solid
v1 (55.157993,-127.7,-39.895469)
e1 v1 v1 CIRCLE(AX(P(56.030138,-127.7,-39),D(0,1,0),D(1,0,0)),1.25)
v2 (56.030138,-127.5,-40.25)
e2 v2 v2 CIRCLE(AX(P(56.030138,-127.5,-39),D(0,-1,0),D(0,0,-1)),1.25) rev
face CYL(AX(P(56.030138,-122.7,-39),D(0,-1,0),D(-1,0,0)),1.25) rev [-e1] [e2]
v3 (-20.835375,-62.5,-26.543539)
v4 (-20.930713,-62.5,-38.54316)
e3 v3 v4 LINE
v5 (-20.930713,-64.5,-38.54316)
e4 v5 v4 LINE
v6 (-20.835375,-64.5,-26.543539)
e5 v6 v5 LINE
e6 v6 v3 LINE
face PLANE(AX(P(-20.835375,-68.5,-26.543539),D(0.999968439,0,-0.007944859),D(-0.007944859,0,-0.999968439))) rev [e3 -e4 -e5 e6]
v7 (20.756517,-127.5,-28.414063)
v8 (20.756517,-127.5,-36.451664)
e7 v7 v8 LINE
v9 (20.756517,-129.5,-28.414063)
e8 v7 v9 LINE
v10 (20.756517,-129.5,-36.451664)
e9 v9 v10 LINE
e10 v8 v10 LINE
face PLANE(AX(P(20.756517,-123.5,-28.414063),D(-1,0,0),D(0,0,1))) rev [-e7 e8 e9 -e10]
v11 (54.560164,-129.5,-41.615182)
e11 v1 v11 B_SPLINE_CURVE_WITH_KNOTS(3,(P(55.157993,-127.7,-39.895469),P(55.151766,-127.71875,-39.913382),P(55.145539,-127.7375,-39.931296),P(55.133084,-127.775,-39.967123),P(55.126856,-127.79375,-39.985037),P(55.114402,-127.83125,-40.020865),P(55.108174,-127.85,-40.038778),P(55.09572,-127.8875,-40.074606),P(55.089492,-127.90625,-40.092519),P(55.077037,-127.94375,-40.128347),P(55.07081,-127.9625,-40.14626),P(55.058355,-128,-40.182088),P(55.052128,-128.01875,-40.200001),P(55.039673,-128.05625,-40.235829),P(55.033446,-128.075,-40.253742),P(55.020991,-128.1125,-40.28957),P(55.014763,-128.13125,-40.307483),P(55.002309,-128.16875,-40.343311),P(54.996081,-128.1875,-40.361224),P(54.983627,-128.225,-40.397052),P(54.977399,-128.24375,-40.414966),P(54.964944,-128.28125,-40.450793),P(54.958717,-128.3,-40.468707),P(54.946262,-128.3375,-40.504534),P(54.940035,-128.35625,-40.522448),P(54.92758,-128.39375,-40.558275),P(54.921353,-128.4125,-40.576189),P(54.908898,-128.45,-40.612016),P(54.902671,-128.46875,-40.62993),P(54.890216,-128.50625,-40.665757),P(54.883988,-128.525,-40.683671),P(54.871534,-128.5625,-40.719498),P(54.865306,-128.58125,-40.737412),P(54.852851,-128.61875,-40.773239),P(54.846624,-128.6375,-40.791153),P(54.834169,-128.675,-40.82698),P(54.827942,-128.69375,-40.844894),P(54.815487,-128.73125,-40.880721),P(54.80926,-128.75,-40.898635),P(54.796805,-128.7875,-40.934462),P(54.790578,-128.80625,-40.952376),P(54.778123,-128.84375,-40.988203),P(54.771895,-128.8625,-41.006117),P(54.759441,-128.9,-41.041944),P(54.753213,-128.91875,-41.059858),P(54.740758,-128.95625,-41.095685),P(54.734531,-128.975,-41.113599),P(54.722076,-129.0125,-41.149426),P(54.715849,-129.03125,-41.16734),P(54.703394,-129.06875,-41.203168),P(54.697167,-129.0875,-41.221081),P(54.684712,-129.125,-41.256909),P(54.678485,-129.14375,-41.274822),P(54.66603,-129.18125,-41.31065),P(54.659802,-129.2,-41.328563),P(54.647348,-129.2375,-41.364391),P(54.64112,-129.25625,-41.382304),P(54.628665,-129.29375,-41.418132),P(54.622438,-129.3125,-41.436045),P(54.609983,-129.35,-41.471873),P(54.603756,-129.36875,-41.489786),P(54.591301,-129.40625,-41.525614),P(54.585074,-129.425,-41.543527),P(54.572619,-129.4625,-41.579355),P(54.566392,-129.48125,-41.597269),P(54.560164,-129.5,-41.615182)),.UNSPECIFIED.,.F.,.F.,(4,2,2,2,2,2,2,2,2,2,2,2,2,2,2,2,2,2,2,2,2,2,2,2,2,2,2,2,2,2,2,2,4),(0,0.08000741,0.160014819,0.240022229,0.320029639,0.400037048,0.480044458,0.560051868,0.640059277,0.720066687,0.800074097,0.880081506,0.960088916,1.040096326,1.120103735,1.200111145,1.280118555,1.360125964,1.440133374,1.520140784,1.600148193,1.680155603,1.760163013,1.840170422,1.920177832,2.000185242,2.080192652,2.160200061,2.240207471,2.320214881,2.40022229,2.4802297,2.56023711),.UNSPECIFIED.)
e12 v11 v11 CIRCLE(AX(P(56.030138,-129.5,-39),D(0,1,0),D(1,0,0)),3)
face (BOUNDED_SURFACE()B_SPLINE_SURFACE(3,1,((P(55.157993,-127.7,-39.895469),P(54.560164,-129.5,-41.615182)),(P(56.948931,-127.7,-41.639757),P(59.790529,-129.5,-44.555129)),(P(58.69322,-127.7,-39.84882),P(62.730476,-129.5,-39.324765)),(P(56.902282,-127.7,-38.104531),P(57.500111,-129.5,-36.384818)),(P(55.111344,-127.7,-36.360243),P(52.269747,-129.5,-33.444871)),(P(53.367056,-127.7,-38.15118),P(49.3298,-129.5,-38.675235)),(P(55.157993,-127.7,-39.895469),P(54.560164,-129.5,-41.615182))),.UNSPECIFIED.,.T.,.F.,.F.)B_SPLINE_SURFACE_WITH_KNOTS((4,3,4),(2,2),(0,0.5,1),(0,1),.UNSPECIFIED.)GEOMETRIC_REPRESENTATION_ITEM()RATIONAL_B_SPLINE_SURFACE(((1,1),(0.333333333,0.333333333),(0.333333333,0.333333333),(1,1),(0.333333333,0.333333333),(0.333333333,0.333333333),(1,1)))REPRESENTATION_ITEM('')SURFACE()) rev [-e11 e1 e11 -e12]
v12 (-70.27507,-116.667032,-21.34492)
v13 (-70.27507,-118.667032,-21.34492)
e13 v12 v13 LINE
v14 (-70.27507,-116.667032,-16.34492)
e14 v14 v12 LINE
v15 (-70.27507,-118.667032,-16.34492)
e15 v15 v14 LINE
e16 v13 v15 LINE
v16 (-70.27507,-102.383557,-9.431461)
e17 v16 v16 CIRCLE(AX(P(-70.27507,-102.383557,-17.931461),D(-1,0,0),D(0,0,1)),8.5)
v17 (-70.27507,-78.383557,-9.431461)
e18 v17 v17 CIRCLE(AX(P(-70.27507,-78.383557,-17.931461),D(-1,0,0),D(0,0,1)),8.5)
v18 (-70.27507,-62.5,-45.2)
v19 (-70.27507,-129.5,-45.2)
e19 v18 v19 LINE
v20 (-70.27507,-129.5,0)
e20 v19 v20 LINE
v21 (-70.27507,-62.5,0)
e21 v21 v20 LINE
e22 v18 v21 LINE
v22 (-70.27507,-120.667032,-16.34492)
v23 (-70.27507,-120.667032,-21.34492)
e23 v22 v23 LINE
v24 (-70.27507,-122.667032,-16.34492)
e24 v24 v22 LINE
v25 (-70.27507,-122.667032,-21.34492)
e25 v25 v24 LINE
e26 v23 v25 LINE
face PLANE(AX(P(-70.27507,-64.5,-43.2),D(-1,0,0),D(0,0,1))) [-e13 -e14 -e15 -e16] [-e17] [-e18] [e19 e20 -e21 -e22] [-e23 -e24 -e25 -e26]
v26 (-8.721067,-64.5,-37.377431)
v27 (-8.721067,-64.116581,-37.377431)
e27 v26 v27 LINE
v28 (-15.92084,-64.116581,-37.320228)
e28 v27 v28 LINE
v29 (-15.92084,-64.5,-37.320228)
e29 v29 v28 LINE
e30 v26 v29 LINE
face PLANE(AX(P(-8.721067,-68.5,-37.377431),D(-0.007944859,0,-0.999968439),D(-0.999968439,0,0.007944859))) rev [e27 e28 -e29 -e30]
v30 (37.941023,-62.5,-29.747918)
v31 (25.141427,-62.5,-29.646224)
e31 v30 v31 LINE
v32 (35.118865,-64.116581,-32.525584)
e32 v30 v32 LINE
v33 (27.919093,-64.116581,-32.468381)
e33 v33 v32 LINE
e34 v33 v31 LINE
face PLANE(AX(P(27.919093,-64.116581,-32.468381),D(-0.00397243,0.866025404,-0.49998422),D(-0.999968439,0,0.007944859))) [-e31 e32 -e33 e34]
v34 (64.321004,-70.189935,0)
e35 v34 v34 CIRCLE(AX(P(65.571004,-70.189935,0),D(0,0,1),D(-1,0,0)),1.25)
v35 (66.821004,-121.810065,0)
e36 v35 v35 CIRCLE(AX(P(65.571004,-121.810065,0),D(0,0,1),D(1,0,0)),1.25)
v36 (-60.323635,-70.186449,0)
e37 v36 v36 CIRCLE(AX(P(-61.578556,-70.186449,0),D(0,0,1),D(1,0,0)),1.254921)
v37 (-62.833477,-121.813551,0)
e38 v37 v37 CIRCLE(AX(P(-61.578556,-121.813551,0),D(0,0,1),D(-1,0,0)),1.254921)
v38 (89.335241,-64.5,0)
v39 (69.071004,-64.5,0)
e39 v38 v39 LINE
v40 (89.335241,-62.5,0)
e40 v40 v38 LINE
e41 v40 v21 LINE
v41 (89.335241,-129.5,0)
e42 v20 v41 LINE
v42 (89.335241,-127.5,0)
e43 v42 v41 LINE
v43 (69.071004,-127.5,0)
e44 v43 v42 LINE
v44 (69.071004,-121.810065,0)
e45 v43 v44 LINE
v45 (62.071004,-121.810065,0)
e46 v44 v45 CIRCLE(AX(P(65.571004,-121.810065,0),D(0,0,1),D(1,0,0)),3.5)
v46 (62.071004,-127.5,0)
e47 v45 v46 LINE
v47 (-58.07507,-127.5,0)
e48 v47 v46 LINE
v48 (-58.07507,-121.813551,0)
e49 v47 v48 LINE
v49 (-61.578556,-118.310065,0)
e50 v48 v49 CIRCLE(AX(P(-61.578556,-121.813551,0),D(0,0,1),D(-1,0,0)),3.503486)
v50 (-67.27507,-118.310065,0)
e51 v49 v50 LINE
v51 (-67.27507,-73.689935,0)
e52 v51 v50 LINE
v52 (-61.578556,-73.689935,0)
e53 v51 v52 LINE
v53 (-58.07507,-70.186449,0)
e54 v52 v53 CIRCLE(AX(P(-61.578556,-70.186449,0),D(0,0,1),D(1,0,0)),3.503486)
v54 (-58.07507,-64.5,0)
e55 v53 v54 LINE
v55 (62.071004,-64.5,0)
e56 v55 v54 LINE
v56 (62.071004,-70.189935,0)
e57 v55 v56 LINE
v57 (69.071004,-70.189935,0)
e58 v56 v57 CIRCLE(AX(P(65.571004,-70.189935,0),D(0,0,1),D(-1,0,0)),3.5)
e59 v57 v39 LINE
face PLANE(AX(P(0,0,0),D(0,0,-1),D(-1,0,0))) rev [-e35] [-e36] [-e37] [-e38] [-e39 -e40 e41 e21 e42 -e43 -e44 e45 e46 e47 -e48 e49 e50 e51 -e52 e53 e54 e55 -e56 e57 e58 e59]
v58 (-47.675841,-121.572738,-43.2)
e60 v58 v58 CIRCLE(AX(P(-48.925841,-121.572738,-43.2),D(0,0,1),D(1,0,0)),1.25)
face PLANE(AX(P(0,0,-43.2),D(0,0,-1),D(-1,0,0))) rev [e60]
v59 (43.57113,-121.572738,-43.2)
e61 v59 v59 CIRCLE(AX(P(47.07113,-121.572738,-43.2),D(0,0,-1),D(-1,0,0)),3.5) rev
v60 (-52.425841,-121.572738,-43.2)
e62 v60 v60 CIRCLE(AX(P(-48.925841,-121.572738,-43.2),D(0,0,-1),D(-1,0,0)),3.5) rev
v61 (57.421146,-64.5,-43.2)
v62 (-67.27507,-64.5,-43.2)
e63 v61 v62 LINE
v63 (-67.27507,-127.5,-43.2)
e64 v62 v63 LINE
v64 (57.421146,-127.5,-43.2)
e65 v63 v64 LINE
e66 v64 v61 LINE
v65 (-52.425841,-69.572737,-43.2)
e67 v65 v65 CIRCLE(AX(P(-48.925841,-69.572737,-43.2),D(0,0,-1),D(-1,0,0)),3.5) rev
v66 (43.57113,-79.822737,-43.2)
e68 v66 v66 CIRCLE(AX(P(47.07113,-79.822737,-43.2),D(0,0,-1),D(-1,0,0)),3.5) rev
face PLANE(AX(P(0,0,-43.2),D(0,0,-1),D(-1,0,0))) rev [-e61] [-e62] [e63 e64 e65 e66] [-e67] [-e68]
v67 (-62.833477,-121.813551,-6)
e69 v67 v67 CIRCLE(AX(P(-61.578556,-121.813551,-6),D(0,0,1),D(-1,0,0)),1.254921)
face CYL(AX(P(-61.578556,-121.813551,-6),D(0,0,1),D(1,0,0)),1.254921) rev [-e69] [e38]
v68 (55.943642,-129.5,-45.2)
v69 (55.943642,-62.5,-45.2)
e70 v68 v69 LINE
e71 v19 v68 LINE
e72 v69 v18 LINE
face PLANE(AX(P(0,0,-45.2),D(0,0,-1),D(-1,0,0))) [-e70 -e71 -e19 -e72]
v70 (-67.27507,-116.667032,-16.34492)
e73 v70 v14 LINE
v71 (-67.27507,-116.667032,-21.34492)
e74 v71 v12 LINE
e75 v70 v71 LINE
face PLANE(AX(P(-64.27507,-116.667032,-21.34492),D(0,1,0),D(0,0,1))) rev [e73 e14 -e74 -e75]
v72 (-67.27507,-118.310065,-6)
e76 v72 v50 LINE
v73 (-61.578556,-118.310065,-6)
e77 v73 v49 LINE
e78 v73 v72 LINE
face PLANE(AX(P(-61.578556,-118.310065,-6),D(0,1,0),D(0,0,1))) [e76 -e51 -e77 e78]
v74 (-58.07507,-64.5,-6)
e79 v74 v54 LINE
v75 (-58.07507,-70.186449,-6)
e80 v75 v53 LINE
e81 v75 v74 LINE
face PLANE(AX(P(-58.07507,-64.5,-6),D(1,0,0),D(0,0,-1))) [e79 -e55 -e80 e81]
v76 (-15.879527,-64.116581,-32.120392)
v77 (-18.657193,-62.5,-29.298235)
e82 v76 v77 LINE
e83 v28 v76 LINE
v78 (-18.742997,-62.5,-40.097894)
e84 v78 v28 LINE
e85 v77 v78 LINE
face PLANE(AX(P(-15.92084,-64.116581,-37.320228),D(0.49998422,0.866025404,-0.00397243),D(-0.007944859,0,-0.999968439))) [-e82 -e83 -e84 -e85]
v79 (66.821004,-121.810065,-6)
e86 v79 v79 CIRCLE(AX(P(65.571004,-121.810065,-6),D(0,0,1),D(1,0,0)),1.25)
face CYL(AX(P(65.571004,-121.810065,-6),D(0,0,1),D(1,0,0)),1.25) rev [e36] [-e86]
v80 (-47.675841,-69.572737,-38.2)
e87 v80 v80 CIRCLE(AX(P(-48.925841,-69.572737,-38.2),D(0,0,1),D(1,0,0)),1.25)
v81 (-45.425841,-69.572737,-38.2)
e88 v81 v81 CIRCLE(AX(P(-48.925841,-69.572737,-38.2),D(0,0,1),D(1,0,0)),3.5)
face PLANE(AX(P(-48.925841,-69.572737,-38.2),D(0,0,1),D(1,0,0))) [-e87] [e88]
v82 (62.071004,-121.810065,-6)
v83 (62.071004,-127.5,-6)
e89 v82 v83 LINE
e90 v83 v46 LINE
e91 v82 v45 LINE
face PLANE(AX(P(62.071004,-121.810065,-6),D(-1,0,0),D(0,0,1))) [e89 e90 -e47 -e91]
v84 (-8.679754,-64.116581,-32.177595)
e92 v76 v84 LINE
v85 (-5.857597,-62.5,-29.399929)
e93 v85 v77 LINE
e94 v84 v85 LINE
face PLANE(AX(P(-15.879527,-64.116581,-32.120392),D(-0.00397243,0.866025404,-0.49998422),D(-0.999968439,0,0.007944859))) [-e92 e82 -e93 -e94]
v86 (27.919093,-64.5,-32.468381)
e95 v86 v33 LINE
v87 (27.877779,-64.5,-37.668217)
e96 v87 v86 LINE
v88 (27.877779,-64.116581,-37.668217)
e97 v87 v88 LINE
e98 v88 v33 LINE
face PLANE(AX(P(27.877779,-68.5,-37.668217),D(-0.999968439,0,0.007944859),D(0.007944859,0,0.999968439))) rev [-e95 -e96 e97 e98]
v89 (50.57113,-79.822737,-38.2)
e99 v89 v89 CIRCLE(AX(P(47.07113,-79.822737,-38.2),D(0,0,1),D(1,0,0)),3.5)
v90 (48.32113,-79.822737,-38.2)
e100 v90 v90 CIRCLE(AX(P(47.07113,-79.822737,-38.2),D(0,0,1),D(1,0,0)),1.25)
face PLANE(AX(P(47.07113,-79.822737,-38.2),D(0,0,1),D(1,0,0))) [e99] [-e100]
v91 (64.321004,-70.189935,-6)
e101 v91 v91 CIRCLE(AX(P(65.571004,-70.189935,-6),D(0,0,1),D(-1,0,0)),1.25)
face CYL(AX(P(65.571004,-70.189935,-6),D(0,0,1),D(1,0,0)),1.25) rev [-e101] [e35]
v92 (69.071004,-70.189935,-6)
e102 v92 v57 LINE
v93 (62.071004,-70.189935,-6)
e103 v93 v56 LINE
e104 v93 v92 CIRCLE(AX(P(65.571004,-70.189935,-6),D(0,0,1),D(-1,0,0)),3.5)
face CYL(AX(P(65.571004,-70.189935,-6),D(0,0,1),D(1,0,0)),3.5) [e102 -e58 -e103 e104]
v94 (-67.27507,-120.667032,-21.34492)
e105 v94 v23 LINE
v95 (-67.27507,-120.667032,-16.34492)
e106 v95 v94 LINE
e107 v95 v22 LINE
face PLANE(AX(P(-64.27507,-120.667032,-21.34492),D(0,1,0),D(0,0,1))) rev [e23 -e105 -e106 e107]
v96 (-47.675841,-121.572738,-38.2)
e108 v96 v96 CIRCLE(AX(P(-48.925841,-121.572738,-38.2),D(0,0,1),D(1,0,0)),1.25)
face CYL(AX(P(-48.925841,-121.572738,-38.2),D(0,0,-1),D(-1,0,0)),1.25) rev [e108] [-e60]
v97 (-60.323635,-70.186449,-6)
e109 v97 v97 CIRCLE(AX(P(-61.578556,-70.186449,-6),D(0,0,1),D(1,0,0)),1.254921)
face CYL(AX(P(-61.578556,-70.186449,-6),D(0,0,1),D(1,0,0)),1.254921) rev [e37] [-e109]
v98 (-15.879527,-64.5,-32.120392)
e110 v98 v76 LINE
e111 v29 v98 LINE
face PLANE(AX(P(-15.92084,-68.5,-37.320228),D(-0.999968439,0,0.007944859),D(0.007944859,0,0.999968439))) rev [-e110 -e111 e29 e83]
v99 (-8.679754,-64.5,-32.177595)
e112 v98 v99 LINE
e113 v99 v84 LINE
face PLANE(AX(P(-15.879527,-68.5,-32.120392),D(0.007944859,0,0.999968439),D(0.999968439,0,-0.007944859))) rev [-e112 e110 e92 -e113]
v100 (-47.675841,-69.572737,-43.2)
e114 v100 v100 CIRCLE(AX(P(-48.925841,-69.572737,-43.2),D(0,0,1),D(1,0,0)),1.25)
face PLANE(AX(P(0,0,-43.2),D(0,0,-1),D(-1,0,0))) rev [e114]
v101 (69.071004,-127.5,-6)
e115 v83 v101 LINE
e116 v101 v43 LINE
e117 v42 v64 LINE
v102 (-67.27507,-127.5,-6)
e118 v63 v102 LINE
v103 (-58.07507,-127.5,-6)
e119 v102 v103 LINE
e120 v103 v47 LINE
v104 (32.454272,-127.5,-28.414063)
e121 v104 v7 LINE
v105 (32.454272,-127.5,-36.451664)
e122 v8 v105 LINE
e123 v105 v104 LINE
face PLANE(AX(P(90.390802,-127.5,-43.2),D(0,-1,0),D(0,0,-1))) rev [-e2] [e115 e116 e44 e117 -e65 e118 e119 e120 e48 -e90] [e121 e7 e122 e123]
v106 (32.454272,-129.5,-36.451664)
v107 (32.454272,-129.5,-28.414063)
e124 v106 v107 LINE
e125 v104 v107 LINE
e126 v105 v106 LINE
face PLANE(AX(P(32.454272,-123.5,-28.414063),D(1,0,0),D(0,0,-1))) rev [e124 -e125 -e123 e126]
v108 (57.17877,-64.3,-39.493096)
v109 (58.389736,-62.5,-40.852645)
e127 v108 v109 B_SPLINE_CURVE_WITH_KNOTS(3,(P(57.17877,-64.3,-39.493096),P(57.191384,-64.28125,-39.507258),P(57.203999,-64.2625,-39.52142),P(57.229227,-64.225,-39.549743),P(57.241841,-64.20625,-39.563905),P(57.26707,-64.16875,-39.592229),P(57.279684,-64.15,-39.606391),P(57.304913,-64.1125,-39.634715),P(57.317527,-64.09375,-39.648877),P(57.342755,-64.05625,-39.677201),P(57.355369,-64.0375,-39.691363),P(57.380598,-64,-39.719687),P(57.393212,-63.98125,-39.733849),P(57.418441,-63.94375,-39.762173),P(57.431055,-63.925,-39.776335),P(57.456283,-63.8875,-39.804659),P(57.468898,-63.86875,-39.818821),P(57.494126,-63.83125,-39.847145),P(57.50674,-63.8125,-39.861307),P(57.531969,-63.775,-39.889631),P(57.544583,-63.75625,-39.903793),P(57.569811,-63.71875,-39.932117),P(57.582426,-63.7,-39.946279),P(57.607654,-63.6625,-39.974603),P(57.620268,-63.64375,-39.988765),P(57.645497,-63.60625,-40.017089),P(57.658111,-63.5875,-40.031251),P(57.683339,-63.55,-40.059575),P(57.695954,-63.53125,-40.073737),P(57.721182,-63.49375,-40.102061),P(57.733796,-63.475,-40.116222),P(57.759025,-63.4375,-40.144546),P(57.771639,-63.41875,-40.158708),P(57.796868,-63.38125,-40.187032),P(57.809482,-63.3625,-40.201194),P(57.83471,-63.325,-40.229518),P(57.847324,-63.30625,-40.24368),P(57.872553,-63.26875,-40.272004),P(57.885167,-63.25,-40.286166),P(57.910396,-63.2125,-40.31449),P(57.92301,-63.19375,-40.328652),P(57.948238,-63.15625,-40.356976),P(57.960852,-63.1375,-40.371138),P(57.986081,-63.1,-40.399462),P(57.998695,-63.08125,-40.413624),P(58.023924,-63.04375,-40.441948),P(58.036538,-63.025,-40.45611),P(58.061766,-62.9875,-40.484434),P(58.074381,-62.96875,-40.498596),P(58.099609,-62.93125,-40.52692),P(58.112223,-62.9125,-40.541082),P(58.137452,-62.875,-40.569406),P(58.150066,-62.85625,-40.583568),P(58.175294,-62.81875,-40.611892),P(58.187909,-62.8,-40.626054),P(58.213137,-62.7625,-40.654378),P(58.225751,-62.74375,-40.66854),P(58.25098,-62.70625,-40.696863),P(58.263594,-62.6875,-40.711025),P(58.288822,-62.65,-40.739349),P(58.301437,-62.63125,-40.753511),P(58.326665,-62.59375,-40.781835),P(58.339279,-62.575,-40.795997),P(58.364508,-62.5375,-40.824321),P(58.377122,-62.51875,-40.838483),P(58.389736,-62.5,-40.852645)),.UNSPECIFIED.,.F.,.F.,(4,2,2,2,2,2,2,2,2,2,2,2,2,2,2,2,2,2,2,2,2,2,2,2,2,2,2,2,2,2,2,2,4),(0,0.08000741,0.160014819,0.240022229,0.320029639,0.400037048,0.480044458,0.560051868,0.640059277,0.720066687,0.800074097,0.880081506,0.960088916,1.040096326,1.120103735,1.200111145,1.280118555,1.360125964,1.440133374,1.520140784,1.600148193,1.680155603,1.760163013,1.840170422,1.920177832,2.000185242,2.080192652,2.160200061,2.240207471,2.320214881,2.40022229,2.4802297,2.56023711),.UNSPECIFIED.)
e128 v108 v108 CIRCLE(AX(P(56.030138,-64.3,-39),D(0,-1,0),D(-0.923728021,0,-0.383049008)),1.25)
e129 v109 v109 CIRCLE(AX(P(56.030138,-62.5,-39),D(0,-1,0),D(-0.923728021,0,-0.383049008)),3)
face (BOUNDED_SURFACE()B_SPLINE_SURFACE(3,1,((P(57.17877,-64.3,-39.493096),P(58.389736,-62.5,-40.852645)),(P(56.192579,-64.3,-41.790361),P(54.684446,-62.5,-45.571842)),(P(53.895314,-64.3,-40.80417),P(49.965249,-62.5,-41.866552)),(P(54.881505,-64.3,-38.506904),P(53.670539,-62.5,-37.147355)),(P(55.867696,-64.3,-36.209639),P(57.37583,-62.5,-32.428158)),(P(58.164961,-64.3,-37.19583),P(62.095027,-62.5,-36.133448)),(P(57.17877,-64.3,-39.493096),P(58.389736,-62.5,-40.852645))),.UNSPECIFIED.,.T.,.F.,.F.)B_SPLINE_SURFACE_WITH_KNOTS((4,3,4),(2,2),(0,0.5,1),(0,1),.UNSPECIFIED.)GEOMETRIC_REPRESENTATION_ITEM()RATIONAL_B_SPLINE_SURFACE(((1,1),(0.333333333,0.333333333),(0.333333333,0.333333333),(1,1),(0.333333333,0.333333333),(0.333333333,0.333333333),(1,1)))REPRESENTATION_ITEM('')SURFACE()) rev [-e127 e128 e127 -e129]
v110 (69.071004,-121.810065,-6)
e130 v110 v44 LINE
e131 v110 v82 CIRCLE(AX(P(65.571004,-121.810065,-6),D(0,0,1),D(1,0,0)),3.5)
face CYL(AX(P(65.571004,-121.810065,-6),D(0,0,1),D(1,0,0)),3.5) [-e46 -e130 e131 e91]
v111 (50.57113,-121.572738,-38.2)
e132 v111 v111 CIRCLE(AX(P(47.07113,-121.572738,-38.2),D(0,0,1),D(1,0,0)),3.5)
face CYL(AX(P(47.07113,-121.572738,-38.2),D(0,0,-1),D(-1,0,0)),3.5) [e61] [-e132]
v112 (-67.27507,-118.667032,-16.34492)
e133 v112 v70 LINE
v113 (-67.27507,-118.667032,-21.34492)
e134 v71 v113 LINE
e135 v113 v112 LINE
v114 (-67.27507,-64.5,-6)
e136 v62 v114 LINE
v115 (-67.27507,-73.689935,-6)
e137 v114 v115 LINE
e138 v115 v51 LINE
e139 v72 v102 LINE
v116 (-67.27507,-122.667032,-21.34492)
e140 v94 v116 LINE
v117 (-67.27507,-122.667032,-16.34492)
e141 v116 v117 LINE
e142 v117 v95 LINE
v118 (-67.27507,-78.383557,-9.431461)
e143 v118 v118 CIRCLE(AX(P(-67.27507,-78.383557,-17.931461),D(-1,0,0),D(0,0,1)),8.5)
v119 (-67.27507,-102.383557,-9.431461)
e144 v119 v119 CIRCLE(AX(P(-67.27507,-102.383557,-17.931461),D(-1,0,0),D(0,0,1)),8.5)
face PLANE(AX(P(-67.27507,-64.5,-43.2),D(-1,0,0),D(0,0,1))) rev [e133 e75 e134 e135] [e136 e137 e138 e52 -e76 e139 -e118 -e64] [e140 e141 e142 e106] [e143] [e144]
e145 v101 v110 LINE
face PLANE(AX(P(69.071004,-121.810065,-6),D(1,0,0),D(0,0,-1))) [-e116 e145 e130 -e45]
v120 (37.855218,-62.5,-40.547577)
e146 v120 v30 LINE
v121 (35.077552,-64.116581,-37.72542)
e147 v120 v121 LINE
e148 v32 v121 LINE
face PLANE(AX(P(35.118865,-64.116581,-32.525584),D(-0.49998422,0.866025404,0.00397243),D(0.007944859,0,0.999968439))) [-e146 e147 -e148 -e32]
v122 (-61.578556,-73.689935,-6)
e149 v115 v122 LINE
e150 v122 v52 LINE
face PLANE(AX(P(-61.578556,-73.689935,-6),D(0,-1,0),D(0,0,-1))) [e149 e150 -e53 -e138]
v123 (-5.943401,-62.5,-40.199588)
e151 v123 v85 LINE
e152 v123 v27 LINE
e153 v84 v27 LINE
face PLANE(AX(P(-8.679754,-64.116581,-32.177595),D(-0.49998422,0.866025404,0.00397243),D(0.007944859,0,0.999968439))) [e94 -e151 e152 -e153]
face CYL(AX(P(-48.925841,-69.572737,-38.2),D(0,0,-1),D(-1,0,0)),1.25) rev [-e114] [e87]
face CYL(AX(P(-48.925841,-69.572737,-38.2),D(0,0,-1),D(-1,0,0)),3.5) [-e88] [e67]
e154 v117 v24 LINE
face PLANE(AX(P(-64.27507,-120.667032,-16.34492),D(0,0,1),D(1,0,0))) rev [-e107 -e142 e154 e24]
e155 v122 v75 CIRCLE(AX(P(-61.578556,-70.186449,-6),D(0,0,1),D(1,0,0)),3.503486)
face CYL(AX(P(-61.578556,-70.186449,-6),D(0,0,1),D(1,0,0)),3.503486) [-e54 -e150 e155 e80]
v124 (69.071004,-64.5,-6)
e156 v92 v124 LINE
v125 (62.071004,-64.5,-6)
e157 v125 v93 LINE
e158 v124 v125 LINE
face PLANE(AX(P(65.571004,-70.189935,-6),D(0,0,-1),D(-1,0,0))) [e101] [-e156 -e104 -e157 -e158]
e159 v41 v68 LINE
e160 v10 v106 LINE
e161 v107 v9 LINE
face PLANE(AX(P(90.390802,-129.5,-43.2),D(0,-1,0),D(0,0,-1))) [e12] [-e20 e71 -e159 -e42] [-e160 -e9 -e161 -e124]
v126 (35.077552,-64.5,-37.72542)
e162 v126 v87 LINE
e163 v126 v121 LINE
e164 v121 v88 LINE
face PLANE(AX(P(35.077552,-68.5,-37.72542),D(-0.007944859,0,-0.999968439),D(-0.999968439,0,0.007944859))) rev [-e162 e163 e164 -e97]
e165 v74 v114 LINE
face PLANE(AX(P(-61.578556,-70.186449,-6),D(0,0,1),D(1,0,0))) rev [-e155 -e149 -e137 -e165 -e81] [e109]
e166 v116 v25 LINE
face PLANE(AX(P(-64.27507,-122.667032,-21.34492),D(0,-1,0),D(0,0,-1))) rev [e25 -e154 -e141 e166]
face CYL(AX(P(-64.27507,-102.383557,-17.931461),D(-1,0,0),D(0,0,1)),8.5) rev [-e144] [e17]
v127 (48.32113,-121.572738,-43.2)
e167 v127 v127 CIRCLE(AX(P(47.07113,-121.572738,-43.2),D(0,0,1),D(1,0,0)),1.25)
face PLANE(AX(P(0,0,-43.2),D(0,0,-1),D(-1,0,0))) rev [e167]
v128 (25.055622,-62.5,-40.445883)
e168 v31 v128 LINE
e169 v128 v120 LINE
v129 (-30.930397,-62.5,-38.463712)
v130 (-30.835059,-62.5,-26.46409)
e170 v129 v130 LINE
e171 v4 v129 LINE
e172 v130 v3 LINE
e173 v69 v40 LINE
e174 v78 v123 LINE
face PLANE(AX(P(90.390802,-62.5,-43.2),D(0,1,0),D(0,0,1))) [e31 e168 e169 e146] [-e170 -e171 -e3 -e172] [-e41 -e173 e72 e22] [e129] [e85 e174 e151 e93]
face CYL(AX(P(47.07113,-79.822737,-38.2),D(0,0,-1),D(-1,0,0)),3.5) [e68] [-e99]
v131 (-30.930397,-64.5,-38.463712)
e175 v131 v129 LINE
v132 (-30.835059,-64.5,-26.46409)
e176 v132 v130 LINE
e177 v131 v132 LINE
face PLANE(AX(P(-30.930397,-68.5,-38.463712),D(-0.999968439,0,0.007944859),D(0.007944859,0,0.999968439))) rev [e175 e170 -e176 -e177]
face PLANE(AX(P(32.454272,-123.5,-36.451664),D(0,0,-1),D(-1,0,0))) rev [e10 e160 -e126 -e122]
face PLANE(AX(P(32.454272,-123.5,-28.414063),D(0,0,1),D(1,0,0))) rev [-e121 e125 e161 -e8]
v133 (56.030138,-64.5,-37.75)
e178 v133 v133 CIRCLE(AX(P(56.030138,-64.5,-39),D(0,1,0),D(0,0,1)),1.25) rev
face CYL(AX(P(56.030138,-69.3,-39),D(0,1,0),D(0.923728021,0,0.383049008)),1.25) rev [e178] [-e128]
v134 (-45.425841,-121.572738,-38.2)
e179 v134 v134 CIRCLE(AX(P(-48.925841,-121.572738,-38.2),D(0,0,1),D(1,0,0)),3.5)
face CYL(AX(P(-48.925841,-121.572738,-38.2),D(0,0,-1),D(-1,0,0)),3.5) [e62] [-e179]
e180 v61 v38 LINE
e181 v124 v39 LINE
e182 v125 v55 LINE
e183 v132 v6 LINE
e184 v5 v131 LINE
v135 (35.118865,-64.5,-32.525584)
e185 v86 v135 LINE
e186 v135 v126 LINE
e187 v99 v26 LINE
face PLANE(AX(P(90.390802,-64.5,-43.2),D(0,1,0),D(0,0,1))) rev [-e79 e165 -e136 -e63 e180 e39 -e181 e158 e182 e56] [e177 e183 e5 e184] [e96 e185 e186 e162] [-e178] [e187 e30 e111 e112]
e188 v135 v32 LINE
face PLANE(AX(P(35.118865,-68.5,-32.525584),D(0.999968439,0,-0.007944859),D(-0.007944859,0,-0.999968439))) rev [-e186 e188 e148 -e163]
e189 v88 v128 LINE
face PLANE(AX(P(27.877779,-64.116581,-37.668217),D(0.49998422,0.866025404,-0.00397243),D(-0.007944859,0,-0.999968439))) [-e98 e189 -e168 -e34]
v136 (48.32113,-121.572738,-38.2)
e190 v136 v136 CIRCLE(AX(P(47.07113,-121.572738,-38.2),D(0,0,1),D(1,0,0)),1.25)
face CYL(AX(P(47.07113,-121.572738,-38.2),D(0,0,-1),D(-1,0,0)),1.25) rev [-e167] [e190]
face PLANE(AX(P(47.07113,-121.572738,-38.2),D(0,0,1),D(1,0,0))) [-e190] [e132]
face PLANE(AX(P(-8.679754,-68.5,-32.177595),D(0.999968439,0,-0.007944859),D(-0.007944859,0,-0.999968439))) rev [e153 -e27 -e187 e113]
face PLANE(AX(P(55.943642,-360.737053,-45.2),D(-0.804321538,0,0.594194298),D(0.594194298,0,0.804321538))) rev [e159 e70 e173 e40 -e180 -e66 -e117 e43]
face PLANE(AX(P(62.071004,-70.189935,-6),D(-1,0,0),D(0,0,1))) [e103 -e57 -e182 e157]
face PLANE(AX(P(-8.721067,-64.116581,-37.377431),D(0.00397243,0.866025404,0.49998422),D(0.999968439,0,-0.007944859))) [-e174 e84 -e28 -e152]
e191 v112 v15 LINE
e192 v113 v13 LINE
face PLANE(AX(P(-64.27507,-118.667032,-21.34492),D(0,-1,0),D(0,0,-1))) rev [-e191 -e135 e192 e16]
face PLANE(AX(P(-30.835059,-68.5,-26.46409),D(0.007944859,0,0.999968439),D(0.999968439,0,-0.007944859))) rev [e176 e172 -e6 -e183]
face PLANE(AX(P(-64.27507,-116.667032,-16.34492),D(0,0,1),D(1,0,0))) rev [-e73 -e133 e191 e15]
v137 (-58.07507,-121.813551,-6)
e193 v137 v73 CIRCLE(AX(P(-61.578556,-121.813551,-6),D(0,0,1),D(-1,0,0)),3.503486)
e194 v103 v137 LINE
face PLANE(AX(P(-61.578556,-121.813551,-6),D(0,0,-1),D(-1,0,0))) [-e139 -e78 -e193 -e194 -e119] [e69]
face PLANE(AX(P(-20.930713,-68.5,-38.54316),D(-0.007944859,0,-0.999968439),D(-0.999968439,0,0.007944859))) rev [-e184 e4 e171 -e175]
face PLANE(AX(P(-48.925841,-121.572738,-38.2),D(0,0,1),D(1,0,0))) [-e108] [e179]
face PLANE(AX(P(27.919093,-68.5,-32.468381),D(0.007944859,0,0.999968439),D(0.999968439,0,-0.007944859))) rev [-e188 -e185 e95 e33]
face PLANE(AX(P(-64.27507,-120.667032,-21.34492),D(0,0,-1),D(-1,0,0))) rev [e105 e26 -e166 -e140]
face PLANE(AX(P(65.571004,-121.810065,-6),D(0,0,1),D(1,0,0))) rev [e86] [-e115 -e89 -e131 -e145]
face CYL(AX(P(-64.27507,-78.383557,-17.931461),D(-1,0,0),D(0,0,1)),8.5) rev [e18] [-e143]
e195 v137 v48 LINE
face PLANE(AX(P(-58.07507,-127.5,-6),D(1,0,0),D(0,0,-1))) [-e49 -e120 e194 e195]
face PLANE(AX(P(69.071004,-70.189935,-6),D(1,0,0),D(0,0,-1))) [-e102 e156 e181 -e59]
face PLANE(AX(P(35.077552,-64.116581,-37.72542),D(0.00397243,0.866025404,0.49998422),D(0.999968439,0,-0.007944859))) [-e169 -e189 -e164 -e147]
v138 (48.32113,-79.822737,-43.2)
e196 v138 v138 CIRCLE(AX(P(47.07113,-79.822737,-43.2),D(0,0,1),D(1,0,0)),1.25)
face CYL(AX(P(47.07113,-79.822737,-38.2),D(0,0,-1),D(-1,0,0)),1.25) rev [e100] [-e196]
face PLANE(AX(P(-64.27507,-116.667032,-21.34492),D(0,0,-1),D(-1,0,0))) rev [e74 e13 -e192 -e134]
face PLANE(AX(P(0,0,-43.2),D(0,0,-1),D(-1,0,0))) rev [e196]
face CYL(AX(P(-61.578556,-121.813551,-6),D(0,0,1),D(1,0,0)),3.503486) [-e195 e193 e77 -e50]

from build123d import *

# Parameters (mm, degrees)
SZKIC1_W                        = 157.665871289
SZKIC1_H                        = 63
DODANIE_WYCI_GNI_CIE1_DEPTH     = 43.2
WYTNIJ_WYCI_GNI_CIE1_DEPTH      = 70
SKORUPA3_START                  = -70.275069684
SKORUPA3_OUTLINE_W              = 67
SKORUPA3_OUTLINE_H              = 48.2
SKORUPA3_DEPTH                  = 3
SKORUPA3_START_2                = -127.5
SKORUPA3_2_DEPTH                = 63
SKORUPA3_START_3                = -129.5
SKORUPA3_3_DEPTH                = 67
SKORUPA3_4_DEPTH                = 2
SKORUPA3_START_4                = -64.5
SKORUPA3_5_DEPTH                = 2
WYTNIJ_WYCI_GNI_CIE3_DEPTH      = 125.94228845
WYTNIJ_WYCI_GNI_CIE3_DEPTH_BACK = 125.94228845
SZKIC8_W                        = 222.336022924
SZKIC8_H                        = 159.302089512
WYTNIJ_WYCI_GNI_CIE5_DEPTH      = 10
GNIAZDO1_START                  = -65
GNIAZDO1_OUTLINE_R              = 1.25
GNIAZDO1_DEPTH                  = 3
GNIAZDO3_START                  = -130
GNIAZDO3_OUTLINE_R              = 1.25
GNIAZDO3_DEPTH                  = 3
SZKIC12_W                       = 5
SZKIC12_H                       = 2
WYTNIJ_WYCI_GNI_CIE6_DEPTH      = 6
SZKIC14_R                       = 8.5
WYTNIJ_WYCI_GNI_CIE7_DEPTH      = 6
SZKIC15_R                       = 1.254921328
SZKIC15_R_2                     = 1.25
DODANIE_WYCI_GNI_CIE3_DEPTH     = 6
WYTNIJ_WYCI_GNI_CIE8_DEPTH      = 6
SFAZOWANIE1_SIZE                = 2.8
SFAZOWANIE1_SIZE2               = 1.616580754
SFAZOWANIE2_SIZE                = 2.8
SFAZOWANIE2_SIZE2               = 1.616580754
SZKIC18_W                       = 11.697755772
SZKIC18_H                       = 8.037601452
WYTNIJ_WYCI_GNI_CIE9_DEPTH      = 6
SZKIC19_R                       = 3.5
SZKIC19_R_2                     = 1.25
DODANIE_WYCI_GNI_CIE4_DEPTH     = 5


with BuildPart() as part:
    # Szkic1 → Dodanie-wyciągnięcie1 (new body)
    with BuildSketch(Plane.XY):
        with Locations((11.557865961, -96)):
            Rectangle(SZKIC1_W, SZKIC1_H)
    extrude(amount=-DODANIE_WYCI_GNI_CIE1_DEPTH)

    # Szkic2 → Wytnij-wyciągnięcie1 (cut)
    with BuildSketch(Plane.XZ.offset(127.5)):
        Polygon((91.579553956, 3.037978518), (97.149949113, -5.556810967), (99.754808073, -53.374579011), (51.257151272, -51.543792256), align=None)
    extrude(amount=-WYTNIJ_WYCI_GNI_CIE1_DEPTH, mode=Mode.SUBTRACT)

    # Skorupa3: read off the stored shape, not the designer's step
    # Skorupa3 outline → Skorupa3 (add)
    with BuildSketch(Plane.YZ.offset(SKORUPA3_START)):
        with Locations((-96, -21.1)):
            Rectangle(SKORUPA3_OUTLINE_W, SKORUPA3_OUTLINE_H)
    extrude(amount=SKORUPA3_DEPTH)

    # Skorupa3 2 outline → Skorupa3 2 (cut)
    with BuildSketch(Plane(origin=(0, 0, 0), x_dir=(1, 0, 0), z_dir=(0, 1, 0)).offset(SKORUPA3_START_2)):
        Polygon((57.421146073, 43.2), (-67.275069684, 43.2), (-67.275069684, 0), (89.335240673, 0), align=None)
    extrude(amount=SKORUPA3_2_DEPTH, mode=Mode.SUBTRACT)

    # Skorupa3 3 outline → Skorupa3 3 (add)
    with BuildSketch(Plane(origin=(0, 0, 0), x_dir=(1, 0, 0), z_dir=(0, 1, 0)).offset(SKORUPA3_START_3)):
        Polygon((95.281348873, -3), (59.673493323, 45.2), (-67.275069684, 45.2), (-67.275069684, 43.2), (57.421146073, 43.2), (89.335240673, 0), (-67.275069684, 0), (-67.275069684, -3), align=None)
    extrude(amount=SKORUPA3_3_DEPTH)

    # Skorupa3 4 outline → Skorupa3 4 (add)
    with BuildSketch(Plane(origin=(0, 0, 0), x_dir=(1, 0, 0), z_dir=(0, 1, 0)).offset(SKORUPA3_START_3)):
        Polygon((57.421146073, 43.2), (-67.275069684, 43.2), (-67.275069684, 0), (89.335240673, 0), align=None)
    extrude(amount=SKORUPA3_4_DEPTH)

    # Skorupa3 5 outline → Skorupa3 5 (add)
    with BuildSketch(Plane(origin=(0, 0, 0), x_dir=(1, 0, 0), z_dir=(0, 1, 0)).offset(SKORUPA3_START_4)):
        Polygon((57.421146073, 43.2), (-67.275069684, 43.2), (-67.275069684, 0), (89.335240673, 0), align=None)
    extrude(amount=SKORUPA3_5_DEPTH)

    # Szkic6 → Wytnij-wyciągnięcie3 (cut, two sides: drawn at the far end of the back side and taken through both)
    with BuildSketch(Plane.XZ.offset(129.5).offset(-WYTNIJ_WYCI_GNI_CIE3_DEPTH_BACK)):
        Polygon((-150.660373393, -324.866196497), (55.943641693, -45.2), (91.551497243, 3), (298.155512329, 282.666196497), (857.487905323, -130.541833674), (408.672019601, -738.074226668), align=None)
    extrude(amount=WYTNIJ_WYCI_GNI_CIE3_DEPTH + WYTNIJ_WYCI_GNI_CIE3_DEPTH_BACK, mode=Mode.SUBTRACT)


with BuildPart() as body_2:
    # Podziel3: the piece on the far side of the plane
    add(part.part)
    split(bisect_by=Plane(origin=(0, 0, 0), x_dir=(-1, 0, 0), z_dir=(0, 0, -1)), keep=Keep.BOTTOM)

    # Szkic8 → Wytnij-wyciągnięcie5 (cut)
    with BuildSketch(Plane(origin=(0, 0, 0), x_dir=(-1, 0, 0), z_dir=(0, 0, -1))):
        with Locations((-14.849623727, -113.028264145)):
            Rectangle(SZKIC8_W, SZKIC8_H)
    extrude(amount=-WYTNIJ_WYCI_GNI_CIE5_DEPTH, mode=Mode.SUBTRACT)


with BuildPart() as part_1:
    add(part.part)

    # Podziel3
    split(bisect_by=Plane(origin=(0, 0, 0), x_dir=(-1, 0, 0), z_dir=(0, 0, -1)), keep=Keep.TOP)

    # Gniazdo1: read off the stored shape, not the designer's step
    # Gniazdo1 outline → Gniazdo1 (cut)
    with BuildSketch(Plane(origin=(0, 0, 0), x_dir=(1, 0, 0), z_dir=(0, 1, 0)).offset(GNIAZDO1_START)):
        with Locations((56.030137684, 39)):
            Circle(GNIAZDO1_OUTLINE_R)
    extrude(amount=GNIAZDO1_DEPTH, mode=Mode.SUBTRACT)

    # Gniazdo1 2: loft between two sections, ruled curve by curve
    gniazdo1_2_from = [
        Edge.make_bspline([(57.178770241, -64.3, -39.493095579), (56.192579083, -64.3, -41.790360692), (53.89531397, -64.3, -40.804169534), (54.881505128, -64.3, -38.506904421), (55.867696286, -64.3, -36.209639308), (58.164961399, -64.3, -37.195830466), (57.178770241, -64.3, -39.493095579)], [0, 0, 0, 0, 0.5, 0.5, 0.5, 1, 1, 1, 1], 3, [1, 0.333333333, 0.333333333, 1, 0.333333333, 0.333333333, 1]),
    ]
    gniazdo1_2_to = [
        Edge.make_bspline([(58.38973631, -62.5, -40.852645223), (54.684445863, -62.5, -45.571842476), (49.965248611, -62.5, -41.866552029), (53.670539058, -62.5, -37.147354777), (57.375829505, -62.5, -32.428157524), (62.095026757, -62.5, -36.133447971), (58.38973631, -62.5, -40.852645223)], [0, 0, 0, 0, 0.5, 0.5, 0.5, 1, 1, 1, 1], 3, [1, 0.333333333, 0.333333333, 1, 0.333333333, 0.333333333, 1]),
    ]
    gniazdo1_2 = Solid(Shell([*[Face.make_surface_from_curves(gniazdo1_2_from[k], gniazdo1_2_to[k]) for k in range(1)], Face(Wire(gniazdo1_2_from)), Face(Wire(gniazdo1_2_to))]))
    add(gniazdo1_2, mode=Mode.SUBTRACT)

    # Gniazdo3: read off the stored shape, not the designer's step
    # Gniazdo3 outline → Gniazdo3 (cut)
    with BuildSketch(Plane(origin=(0, 0, 0), x_dir=(1, 0, 0), z_dir=(0, 1, 0)).offset(GNIAZDO3_START)):
        with Locations((56.030137684, 39)):
            Circle(GNIAZDO3_OUTLINE_R)
    extrude(amount=GNIAZDO3_DEPTH, mode=Mode.SUBTRACT)

    # Gniazdo3 2: loft between two sections, ruled curve by curve
    gniazdo3_2_from = [
        Edge.make_bspline([(55.157993378, -127.7, -39.895468765), (56.948930908, -127.7, -41.639757378), (58.69321952, -127.7, -39.848819848), (56.90228199, -127.7, -38.104531235), (55.111344461, -127.7, -36.360242622), (53.367055848, -127.7, -38.151180152), (55.157993378, -127.7, -39.895468765)], [0, 0, 0, 0, 0.5, 0.5, 0.5, 1, 1, 1, 1], 3, [1, 0.333333333, 0.333333333, 1, 0.333333333, 0.333333333, 1]),
    ]
    gniazdo3_2_to = [
        Edge.make_bspline([(54.560164229, -129.5, -41.61518222), (59.790528668, -129.5, -44.555129129), (62.730475578, -129.5, -39.32476469), (57.500111139, -129.5, -36.38481778), (52.2697467, -129.5, -33.444870871), (49.32979979, -129.5, -38.67523531), (54.560164229, -129.5, -41.61518222)], [0, 0, 0, 0, 0.5, 0.5, 0.5, 1, 1, 1, 1], 3, [1, 0.333333333, 0.333333333, 1, 0.333333333, 0.333333333, 1]),
    ]
    gniazdo3_2 = Solid(Shell([*[Face.make_surface_from_curves(gniazdo3_2_from[k], gniazdo3_2_to[k]) for k in range(1)], Face(Wire(gniazdo3_2_from)), Face(Wire(gniazdo3_2_to))]))
    add(gniazdo3_2, mode=Mode.SUBTRACT)

    # Szkic12 → Wytnij-wyciągnięcie6 (cut)
    with BuildSketch(Plane.ZY.offset(70.275069684)):
        with Locations((-18.844920008, -121.667032498)):
            Rectangle(SZKIC12_W, SZKIC12_H)
        with Locations((-18.844920008, -117.667032498)):
            Rectangle(SZKIC12_W, SZKIC12_H)
    extrude(amount=-WYTNIJ_WYCI_GNI_CIE6_DEPTH, mode=Mode.SUBTRACT)

    # Szkic14 → Wytnij-wyciągnięcie7 (cut)
    with BuildSketch(Plane.ZY.offset(70.275069684)):
        with Locations((-17.931460918, -102.383556509)):
            Circle(SZKIC14_R)
        with Locations((-17.931460918, -78.383556509)):
            Circle(SZKIC14_R)
    extrude(amount=-WYTNIJ_WYCI_GNI_CIE7_DEPTH, mode=Mode.SUBTRACT)

    # Szkic15 → Dodanie-wyciągnięcie3 (add)
    # profile 1 of 4: a face of its own
    with BuildSketch(Plane.XY):
        with BuildLine():
            Line((-67.275069684, -64.5), (-58.075069684, -64.5))
            Line((-58.075069684, -64.5), (-58.075069684, -70.186449015))
            ThreePointArc((-58.075069684, -70.186449015), (-59.101217036, -72.66378787), (-61.578555891, -73.689935222))
            Line((-61.578555891, -73.689935222), (-67.275069684, -73.689935222))
            Line((-67.275069684, -73.689935222), (-67.275069684, -64.5))
        make_face()
        with Locations((-61.578555891, -70.186449015)):
            Circle(SZKIC15_R, mode=Mode.SUBTRACT)
    # profile 2 of 4: a face of its own
    with BuildSketch(Plane.XY):
        with BuildLine():
            Line((-61.578555891, -118.310064778), (-67.275069684, -118.310064778))
            Line((-67.275069684, -118.310064778), (-67.275069684, -127.5))
            Line((-67.275069684, -127.5), (-58.075069684, -127.5))
            Line((-58.075069684, -127.5), (-58.075069684, -121.813550985))
            ThreePointArc((-58.075069684, -121.813550985), (-59.101217036, -119.33621213), (-61.578555891, -118.310064778))
        make_face()
        with Locations(Location((-61.578555891, -121.813550985, 0), (0, 0, 180))):
            Circle(SZKIC15_R, mode=Mode.SUBTRACT)
    # profile 3 of 4: a face of its own
    with BuildSketch(Plane.XY):
        with BuildLine():
            Line((62.071003797, -64.5), (69.071003797, -64.5))
            Line((69.071003797, -64.5), (69.071003797, -70.189935222))
            ThreePointArc((69.071003797, -70.189935222), (65.571003797, -73.689935222), (62.071003797, -70.189935222))
            Line((62.071003797, -70.189935222), (62.071003797, -64.5))
        make_face()
        with Locations(Location((65.571003797, -70.189935222, 0), (0, 0, 180))):
            Circle(SZKIC15_R_2, mode=Mode.SUBTRACT)
    # profile 4 of 4: a face of its own
    with BuildSketch(Plane.XY):
        with BuildLine():
            Line((62.071003797, -121.810064778), (62.071003797, -127.5))
            Line((62.071003797, -127.5), (69.071003797, -127.5))
            Line((69.071003797, -127.5), (69.071003797, -121.810064778))
            ThreePointArc((69.071003797, -121.810064778), (65.571003797, -118.310064778), (62.071003797, -121.810064778))
        make_face()
        with Locations((65.571003797, -121.810064778)):
            Circle(SZKIC15_R_2, mode=Mode.SUBTRACT)
    extrude(amount=-DODANIE_WYCI_GNI_CIE3_DEPTH)

    # Szkic16 → Wytnij-wyciągnięcie8 (cut)
    with BuildSketch(Plane(origin=(0, -62.5, 0), x_dir=(1, 0, 0), z_dir=(0, 1, 0))):
        Polygon((-30.93039737, 38.46371172), (-30.835059061, 26.464090451), (-20.83537467, 26.543539042), (-20.930712979, 38.543160311), align=None)
        Polygon((-15.920840254, 37.320228125), (-15.879526987, 32.120392242), (-8.679754225, 32.177595227), (-8.721067492, 37.377431111), align=None)
        Polygon((35.118865476, 32.525583902), (35.077552208, 37.725419785), (27.877779447, 37.6682168), (27.919092714, 32.468380916), align=None)
    extrude(amount=-WYTNIJ_WYCI_GNI_CIE8_DEPTH, mode=Mode.SUBTRACT)

    # Sfazowanie1
    sfazowanie1_edges = [part_1.edges().sort_by_distance(p)[0] for p in [
        (-12.320953873, -62.5, -37.348829618),
        (-15.90018362, -62.5, -34.720310183),
        (-12.279640606, -62.5, -32.148993734),
        (-8.700410859, -62.5, -34.777513169),
    ]]
    sfazowanie1_side = [part_1.faces().sort_by_distance(p)[0] for p in [
        (1.68835408, -62.5, -21.274952825),
    ]]
    chamfer(sfazowanie1_edges, length=SFAZOWANIE1_SIZE, length2=SFAZOWANIE1_SIZE2, reference=sfazowanie1_side[0])

    # Sfazowanie2
    sfazowanie2_edges = [part_1.edges().sort_by_distance(p)[0] for p in [
        (31.518979095, -62.5, -32.496982409),
        (35.098208842, -62.5, -35.125501843),
        (31.477665827, -62.5, -37.696818292),
        (27.89843608, -62.5, -35.068298858),
    ]]
    sfazowanie2_side = [part_1.faces().sort_by_distance(p)[0] for p in [
        (1.918169966, -62.5, -21.053592687),
    ]]
    chamfer(sfazowanie2_edges, length=SFAZOWANIE2_SIZE, length2=SFAZOWANIE2_SIZE2, reference=sfazowanie2_side[0])

    # Szkic18 → Wytnij-wyciągnięcie9 (cut)
    with BuildSketch(Plane.XZ.offset(129.5)):
        with Locations((26.605394486, -32.432863354)):
            Rectangle(SZKIC18_W, SZKIC18_H)
    extrude(amount=-WYTNIJ_WYCI_GNI_CIE9_DEPTH, mode=Mode.SUBTRACT)

    # Szkic19 → Dodanie-wyciągnięcie4 (add)
    # profile 1 of 4: a face of its own
    with BuildSketch(Plane.XY.offset(-43.2)):
        with Locations(Location((-48.925840705, -69.572737381, 0), (0, 0, 180))):
            Circle(SZKIC19_R)
        with Locations((-48.925840705, -69.572737381)):
            Circle(SZKIC19_R_2, mode=Mode.SUBTRACT)
    # profile 2 of 4: a face of its own
    with BuildSketch(Plane.XY.offset(-43.2)):
        with Locations(Location((-48.925840705, -121.572737521, 0), (0, 0, 180))):
            Circle(SZKIC19_R)
        with Locations((-48.925840705, -121.572737521)):
            Circle(SZKIC19_R_2, mode=Mode.SUBTRACT)
    # profile 3 of 4: a face of its own
    with BuildSketch(Plane.XY.offset(-43.2)):
        with Locations(Location((47.071130423, -79.822737201, 0), (0, 0, 180))):
            Circle(SZKIC19_R)
        with Locations((47.071130423, -79.822737201)):
            Circle(SZKIC19_R_2, mode=Mode.SUBTRACT)
    # profile 4 of 4: a face of its own
    with BuildSketch(Plane.XY.offset(-43.2)):
        with Locations(Location((47.071130423, -121.572737521, 0), (0, 0, 180))):
            Circle(SZKIC19_R)
        with Locations((47.071130423, -121.572737521)):
            Circle(SZKIC19_R_2, mode=Mode.SUBTRACT)
    extrude(amount=DODANIE_WYCI_GNI_CIE4_DEPTH)


solid = part_1.part
